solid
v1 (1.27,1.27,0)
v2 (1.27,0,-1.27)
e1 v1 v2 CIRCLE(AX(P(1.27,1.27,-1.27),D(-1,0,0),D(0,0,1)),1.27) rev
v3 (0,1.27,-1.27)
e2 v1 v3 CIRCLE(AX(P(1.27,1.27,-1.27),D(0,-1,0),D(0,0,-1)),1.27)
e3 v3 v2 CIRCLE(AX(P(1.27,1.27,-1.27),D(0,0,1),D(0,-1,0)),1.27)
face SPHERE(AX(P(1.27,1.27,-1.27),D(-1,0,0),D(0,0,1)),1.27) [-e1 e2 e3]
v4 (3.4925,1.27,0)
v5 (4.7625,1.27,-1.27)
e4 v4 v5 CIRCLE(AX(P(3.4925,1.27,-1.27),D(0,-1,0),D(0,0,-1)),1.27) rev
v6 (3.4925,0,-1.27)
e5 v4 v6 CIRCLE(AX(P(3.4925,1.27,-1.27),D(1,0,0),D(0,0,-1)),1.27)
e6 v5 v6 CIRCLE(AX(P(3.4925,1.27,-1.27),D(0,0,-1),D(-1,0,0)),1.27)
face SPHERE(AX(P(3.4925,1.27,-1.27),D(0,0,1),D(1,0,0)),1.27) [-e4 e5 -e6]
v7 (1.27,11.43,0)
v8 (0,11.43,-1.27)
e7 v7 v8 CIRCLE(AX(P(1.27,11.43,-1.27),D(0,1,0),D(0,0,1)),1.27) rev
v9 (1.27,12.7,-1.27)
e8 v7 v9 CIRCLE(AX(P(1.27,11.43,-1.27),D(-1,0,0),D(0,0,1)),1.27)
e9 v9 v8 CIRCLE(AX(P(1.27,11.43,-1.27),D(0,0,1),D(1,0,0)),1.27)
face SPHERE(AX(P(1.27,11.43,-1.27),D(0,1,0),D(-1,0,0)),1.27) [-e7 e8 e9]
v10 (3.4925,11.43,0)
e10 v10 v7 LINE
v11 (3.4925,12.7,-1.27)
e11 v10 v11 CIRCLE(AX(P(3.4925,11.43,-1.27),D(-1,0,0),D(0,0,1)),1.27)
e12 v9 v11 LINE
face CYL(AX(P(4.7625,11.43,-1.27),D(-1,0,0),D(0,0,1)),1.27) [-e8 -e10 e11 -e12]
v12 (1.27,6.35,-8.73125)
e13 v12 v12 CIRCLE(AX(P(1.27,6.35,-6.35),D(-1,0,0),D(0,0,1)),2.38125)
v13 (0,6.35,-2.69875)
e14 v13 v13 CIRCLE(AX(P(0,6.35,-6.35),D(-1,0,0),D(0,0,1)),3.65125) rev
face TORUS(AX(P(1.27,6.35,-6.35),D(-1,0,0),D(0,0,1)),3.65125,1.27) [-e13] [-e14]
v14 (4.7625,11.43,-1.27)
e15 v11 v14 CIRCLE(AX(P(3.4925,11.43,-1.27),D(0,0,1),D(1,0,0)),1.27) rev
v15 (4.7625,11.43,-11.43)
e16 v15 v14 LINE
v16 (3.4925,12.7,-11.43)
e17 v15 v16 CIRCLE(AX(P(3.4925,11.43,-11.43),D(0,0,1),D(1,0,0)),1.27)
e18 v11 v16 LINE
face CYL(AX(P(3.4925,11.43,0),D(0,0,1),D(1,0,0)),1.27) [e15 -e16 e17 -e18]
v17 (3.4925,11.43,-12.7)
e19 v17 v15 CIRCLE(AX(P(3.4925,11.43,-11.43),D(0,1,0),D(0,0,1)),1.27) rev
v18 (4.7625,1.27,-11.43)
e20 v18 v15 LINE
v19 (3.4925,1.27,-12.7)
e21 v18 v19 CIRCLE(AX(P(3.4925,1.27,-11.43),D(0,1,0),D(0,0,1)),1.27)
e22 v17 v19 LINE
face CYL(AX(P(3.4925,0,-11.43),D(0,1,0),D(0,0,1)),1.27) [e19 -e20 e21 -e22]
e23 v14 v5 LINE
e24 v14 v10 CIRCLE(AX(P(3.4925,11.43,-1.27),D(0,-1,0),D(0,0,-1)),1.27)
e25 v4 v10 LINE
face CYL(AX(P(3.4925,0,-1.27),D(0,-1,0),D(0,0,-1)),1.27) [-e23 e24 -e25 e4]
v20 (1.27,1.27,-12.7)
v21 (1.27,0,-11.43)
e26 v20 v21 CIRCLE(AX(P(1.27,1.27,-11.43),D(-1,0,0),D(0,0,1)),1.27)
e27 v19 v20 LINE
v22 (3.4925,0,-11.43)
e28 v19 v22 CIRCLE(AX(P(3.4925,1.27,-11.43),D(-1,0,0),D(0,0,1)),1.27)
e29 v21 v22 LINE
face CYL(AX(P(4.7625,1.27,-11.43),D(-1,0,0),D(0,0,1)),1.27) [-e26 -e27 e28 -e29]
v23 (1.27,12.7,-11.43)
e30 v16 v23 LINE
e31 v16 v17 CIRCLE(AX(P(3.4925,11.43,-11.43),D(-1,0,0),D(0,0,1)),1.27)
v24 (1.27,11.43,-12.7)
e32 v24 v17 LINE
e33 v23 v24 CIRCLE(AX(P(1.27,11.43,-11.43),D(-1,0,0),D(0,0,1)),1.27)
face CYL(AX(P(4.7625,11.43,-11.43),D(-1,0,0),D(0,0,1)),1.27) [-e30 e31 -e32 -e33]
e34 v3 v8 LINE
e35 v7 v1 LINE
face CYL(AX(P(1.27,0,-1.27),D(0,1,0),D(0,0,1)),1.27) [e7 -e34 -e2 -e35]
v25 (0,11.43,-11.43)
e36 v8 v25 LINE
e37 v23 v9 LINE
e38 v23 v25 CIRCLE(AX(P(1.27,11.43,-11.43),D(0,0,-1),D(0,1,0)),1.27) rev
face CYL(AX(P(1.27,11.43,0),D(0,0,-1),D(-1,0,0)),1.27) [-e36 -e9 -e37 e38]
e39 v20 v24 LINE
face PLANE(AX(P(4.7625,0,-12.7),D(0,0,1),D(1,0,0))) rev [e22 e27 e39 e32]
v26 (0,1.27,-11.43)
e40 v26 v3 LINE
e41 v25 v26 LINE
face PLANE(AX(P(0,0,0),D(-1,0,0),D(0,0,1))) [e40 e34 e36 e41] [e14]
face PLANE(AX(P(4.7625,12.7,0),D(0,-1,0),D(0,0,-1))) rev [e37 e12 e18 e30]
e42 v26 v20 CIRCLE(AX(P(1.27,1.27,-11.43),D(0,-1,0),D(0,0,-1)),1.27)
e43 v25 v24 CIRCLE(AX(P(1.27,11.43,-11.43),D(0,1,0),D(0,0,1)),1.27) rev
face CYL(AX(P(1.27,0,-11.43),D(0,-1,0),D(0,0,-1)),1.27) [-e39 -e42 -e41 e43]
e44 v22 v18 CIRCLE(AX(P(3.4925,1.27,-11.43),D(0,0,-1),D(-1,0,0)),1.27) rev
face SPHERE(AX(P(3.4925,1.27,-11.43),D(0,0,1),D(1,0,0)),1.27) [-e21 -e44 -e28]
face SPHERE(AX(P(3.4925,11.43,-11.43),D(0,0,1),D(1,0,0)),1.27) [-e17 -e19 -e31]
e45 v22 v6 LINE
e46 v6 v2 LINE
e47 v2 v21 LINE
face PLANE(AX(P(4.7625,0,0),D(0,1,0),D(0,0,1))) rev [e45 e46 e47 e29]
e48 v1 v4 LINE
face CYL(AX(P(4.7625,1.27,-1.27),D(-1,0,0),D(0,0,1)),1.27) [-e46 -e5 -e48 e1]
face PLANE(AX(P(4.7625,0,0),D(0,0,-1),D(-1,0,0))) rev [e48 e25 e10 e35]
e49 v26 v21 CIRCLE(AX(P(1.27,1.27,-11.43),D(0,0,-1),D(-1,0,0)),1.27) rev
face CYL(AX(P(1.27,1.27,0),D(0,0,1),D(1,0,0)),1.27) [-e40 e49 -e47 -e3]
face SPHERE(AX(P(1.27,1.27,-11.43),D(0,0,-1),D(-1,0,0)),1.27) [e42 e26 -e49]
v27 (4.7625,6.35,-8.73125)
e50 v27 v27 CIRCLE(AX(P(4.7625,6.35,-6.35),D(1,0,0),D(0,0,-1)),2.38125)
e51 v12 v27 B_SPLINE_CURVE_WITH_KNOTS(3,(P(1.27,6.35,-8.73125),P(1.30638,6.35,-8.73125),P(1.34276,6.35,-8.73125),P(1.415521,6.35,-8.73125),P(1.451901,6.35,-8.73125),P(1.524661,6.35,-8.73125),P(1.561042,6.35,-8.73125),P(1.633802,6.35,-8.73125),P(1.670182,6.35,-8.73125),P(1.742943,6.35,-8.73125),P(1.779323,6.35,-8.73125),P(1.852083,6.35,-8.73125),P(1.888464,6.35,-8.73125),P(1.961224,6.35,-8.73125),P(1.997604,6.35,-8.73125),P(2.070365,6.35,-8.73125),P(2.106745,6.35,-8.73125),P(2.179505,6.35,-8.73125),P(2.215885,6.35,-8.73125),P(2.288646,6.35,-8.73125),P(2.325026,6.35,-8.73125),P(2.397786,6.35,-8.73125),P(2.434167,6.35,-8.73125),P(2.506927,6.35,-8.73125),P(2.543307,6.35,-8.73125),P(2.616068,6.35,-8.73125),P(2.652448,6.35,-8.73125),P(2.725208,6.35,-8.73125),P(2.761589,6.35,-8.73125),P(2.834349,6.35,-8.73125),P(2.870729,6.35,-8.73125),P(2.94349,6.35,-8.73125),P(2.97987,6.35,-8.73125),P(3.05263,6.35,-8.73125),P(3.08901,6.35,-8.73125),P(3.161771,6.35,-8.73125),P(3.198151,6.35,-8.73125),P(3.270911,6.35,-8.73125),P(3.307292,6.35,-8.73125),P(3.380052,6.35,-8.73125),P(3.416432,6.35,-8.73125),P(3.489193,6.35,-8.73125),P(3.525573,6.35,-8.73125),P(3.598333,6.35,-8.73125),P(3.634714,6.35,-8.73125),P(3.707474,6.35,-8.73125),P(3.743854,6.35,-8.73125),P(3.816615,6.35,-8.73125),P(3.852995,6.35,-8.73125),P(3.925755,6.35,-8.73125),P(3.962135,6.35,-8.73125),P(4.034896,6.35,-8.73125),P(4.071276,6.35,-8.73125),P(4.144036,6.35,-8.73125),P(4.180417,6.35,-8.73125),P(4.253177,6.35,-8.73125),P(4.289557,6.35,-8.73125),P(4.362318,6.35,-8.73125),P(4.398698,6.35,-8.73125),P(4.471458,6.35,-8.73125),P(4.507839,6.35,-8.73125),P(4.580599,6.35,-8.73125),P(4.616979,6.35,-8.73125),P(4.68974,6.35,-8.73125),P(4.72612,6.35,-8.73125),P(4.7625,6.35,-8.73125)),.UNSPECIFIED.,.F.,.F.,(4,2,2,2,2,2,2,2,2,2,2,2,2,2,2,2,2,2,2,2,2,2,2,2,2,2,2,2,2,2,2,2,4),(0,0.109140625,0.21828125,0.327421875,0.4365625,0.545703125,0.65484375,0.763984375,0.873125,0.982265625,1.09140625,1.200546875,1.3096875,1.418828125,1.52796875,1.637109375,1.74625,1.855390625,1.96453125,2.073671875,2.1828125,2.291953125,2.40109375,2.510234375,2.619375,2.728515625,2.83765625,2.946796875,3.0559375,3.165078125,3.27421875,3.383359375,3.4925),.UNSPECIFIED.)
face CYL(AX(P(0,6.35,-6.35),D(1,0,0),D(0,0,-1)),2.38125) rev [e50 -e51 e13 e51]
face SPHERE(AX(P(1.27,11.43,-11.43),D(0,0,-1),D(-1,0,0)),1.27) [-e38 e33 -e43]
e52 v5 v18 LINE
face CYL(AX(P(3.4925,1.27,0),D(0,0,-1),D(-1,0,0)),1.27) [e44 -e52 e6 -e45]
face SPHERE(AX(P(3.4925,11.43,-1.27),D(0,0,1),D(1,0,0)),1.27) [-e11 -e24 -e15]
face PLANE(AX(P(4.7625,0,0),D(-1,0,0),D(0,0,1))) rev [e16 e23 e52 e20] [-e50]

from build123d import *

# Parameters (mm, degrees)
SKETCH2_W           = 12.7
SKETCH2_H           = 12.7
BOSS_EXTRUDE4_DEPTH = 4.7625
SKETCH3_R           = 2.38125
CUT_EXTRUDE1_DEPTH  = 19.581211108
FILLET1_R           = 1.27
FILLET2_R           = 1.27


with BuildPart() as part:
    # Sketch2 → Boss-Extrude4 (new body)
    with BuildSketch(Plane(origin=(0, 0, 0), x_dir=(0, 0, -1), z_dir=(1, 0, 0))):
        with Locations((6.35, 6.35)):
            Rectangle(SKETCH2_W, SKETCH2_H)
    extrude(amount=BOSS_EXTRUDE4_DEPTH)

    # Sketch3 → Cut-Extrude1 (cut, through all)
    with BuildSketch(Plane(origin=(4.7625, 0, 0), x_dir=(0, 0, -1), z_dir=(1, 0, 0))):
        with Locations((6.35, 6.35)):
            Circle(SKETCH3_R)
    extrude(amount=-CUT_EXTRUDE1_DEPTH, mode=Mode.SUBTRACT)

    # Fillet1
    fillet1_edges = [part.edges().sort_by_distance(p)[0] for p in [
        (4.7625, 6.35, -12.7),
        (4.7625, 12.7, -6.35),
        (4.7625, 6.35, 0),
        (4.7625, 0, -6.35),
    ]]
    fillet(fillet1_edges, radius=FILLET1_R)

    # Fillet2
    # the kernel refuses this fillet: 1.27 mm, written as the material it takes off along each edge
    with BuildSketch(Plane(origin=(3.4925, 1.27, -1.27), x_dir=(0, 0, 1), z_dir=(0, -1, 0))) as fillet2_piece_1_section:
        Polygon((0, 0), (FILLET2_R, 0), (FILLET2_R, -FILLET2_R), (0, -FILLET2_R), align=None)
    fillet2_piece_1 = extrude(amount=FILLET2_R, mode=Mode.PRIVATE)
    fillet2_piece_1 = fillet2_piece_1 - Plane(origin=(3.4925, 1.27, -1.27), x_dir=(-0.7071067811865475, 0, -0.7071067811865475), z_dir=(0, -1, 0)) * Sphere(FILLET2_R, mode=Mode.PRIVATE)
    add(fillet2_piece_1, mode=Mode.SUBTRACT)
    with BuildSketch(Plane(origin=(3.4925, 11.43, -1.27), x_dir=(0, 1, 0), z_dir=(0, 0, 1))) as fillet2_piece_2_section:
        Polygon((0, 0), (FILLET2_R, 0), (FILLET2_R, -FILLET2_R), (0, -FILLET2_R), align=None)
    fillet2_piece_2 = extrude(amount=FILLET2_R, mode=Mode.PRIVATE)
    fillet2_piece_2 = fillet2_piece_2 - Plane(origin=(3.4925, 11.43, -1.27), x_dir=(-0.7071067811865475, -0.7071067811865475, 0), z_dir=(0, 0, 1)) * Sphere(FILLET2_R, mode=Mode.PRIVATE)
    add(fillet2_piece_2, mode=Mode.SUBTRACT)
    with BuildSketch(Plane(origin=(3.4925, 1.27, -11.43), x_dir=(0, 0, -1), z_dir=(0, -1, 0))) as fillet2_piece_3_section:
        Polygon((0, 0), (FILLET2_R, 0), (FILLET2_R, FILLET2_R), (0, FILLET2_R), align=None)
    fillet2_piece_3 = extrude(amount=FILLET2_R, mode=Mode.PRIVATE)
    fillet2_piece_3 = fillet2_piece_3 - Plane(origin=(3.4925, 1.27, -11.43), x_dir=(-0.7071067811865475, 0, 0.7071067811865475), z_dir=(0, -1, 0)) * Sphere(FILLET2_R, mode=Mode.PRIVATE)
    add(fillet2_piece_3, mode=Mode.SUBTRACT)
    with BuildSketch(Plane(origin=(3.4925, 11.43, -11.43), x_dir=(0, 1, 0), z_dir=(0, 0, -1))) as fillet2_piece_4_section:
        Polygon((0, 0), (FILLET2_R, 0), (FILLET2_R, FILLET2_R), (0, FILLET2_R), align=None)
    fillet2_piece_4 = extrude(amount=FILLET2_R, mode=Mode.PRIVATE)
    fillet2_piece_4 = fillet2_piece_4 - Plane(origin=(3.4925, 11.43, -11.43), x_dir=(-0.7071067811865475, -0.7071067811865475, 0), z_dir=(0, 0, -1)) * Sphere(FILLET2_R, mode=Mode.PRIVATE)
    add(fillet2_piece_4, mode=Mode.SUBTRACT)
    with BuildSketch(Plane(origin=(1.27, 11.43, -11.43), x_dir=(0, 0, -1), z_dir=(-1, 0, 0))) as fillet2_piece_5_section:
        Polygon((0, 0), (FILLET2_R, 0), (FILLET2_R, -FILLET2_R), (0, -FILLET2_R), align=None)
    fillet2_piece_5 = extrude(amount=FILLET2_R, mode=Mode.PRIVATE)
    fillet2_piece_5 = fillet2_piece_5 - Plane(origin=(1.27, 11.43, -11.43), x_dir=(0, -0.7071067811865475, 0.7071067811865475), z_dir=(-1, 0, 0)) * Sphere(FILLET2_R, mode=Mode.PRIVATE)
    add(fillet2_piece_5, mode=Mode.SUBTRACT)
    with BuildSketch(Plane(origin=(1.27, 1.27, -11.43), x_dir=(-1, 0, 0), z_dir=(0, -1, 0))) as fillet2_piece_6_section:
        Polygon((0, 0), (FILLET2_R, 0), (FILLET2_R, FILLET2_R), (0, FILLET2_R), align=None)
    fillet2_piece_6 = extrude(amount=FILLET2_R, mode=Mode.PRIVATE)
    fillet2_piece_6 = fillet2_piece_6 - Plane(origin=(1.27, 1.27, -11.43), x_dir=(0.7071067811865475, 0, 0.7071067811865475), z_dir=(0, -1, 0)) * Sphere(FILLET2_R, mode=Mode.PRIVATE)
    add(fillet2_piece_6, mode=Mode.SUBTRACT)
    with BuildSketch(Plane(origin=(1.27, 1.27, -1.27), x_dir=(0, 0, 1), z_dir=(0, -1, 0))) as fillet2_piece_7_section:
        Polygon((0, 0), (FILLET2_R, 0), (FILLET2_R, FILLET2_R), (0, FILLET2_R), align=None)
    fillet2_piece_7 = extrude(amount=FILLET2_R, mode=Mode.PRIVATE)
    fillet2_piece_7 = fillet2_piece_7 - Plane(origin=(1.27, 1.27, -1.27), x_dir=(0.7071067811865475, 0, -0.7071067811865475), z_dir=(0, -1, 0)) * Sphere(FILLET2_R, mode=Mode.PRIVATE)
    add(fillet2_piece_7, mode=Mode.SUBTRACT)
    with BuildSketch(Plane(origin=(1.27, 11.43, -1.27), x_dir=(-1, 0, 0), z_dir=(0, 0, 1))) as fillet2_piece_8_section:
        Polygon((0, 0), (FILLET2_R, 0), (FILLET2_R, -FILLET2_R), (0, -FILLET2_R), align=None)
    fillet2_piece_8 = extrude(amount=FILLET2_R, mode=Mode.PRIVATE)
    fillet2_piece_8 = fillet2_piece_8 - Plane(origin=(1.27, 11.43, -1.27), x_dir=(0.7071067811865475, -0.7071067811865475, 0), z_dir=(0, 0, 1)) * Sphere(FILLET2_R, mode=Mode.PRIVATE)
    add(fillet2_piece_8, mode=Mode.SUBTRACT)
    with BuildSketch(Plane(origin=(0, 6.35, -6.35), x_dir=(0, 0, -1), z_dir=(0, -1, 0))) as fillet2_piece_9:
        with BuildLine():
            CenterArc((2.38125 + FILLET2_R, FILLET2_R), FILLET2_R, 180, 90)
            Line((2.38125, FILLET2_R), (2.38125, 0))
            Line((2.38125, 0), (2.38125 + FILLET2_R, 0))
        make_face()
    revolve(axis=Axis((0, 6.35, -6.35), (1, 0, 0)), mode=Mode.SUBTRACT)
    with BuildSketch(Plane(origin=(1.27, 12.7, -12.7), x_dir=(0, -1, 0), z_dir=(1, 0, 0)), Plane(origin=(1.27, 0, -12.7), x_dir=(0, 0, 1), z_dir=(1, 0, 0))) as fillet2_piece_10:
        with BuildLine():
            CenterArc((FILLET2_R, -FILLET2_R), FILLET2_R, 90, 90)
            Line((0, -FILLET2_R), (0, 0))
            Line((0, 0), (FILLET2_R, 0))
        make_face()
    extrude(amount=2.2225, mode=Mode.SUBTRACT)
    with BuildSketch(Plane(origin=(1.27, 0, 0), x_dir=(0, 0, -1), z_dir=(1, 0, 0)), Plane(origin=(1.27, 12.7, 0), x_dir=(0, -1, 0), z_dir=(1, 0, 0))) as fillet2_piece_11:
        with BuildLine():
            CenterArc((FILLET2_R, FILLET2_R), FILLET2_R, 180, 90)
            Line((0, FILLET2_R), (0, 0))
            Line((0, 0), (FILLET2_R, 0))
        make_face()
    extrude(amount=2.2225, mode=Mode.SUBTRACT)
    with BuildSketch(Plane(origin=(0, 12.7, -11.43), x_dir=(0, -1, 0), z_dir=(0, 0, 1)), Plane(origin=(0, 1.27, -12.7), x_dir=(0, 0, 1), z_dir=(0, 1, 0))) as fillet2_piece_12:
        with BuildLine():
            CenterArc((FILLET2_R, FILLET2_R), FILLET2_R, 180, 90)
            Line((0, FILLET2_R), (0, 0))
            Line((0, 0), (FILLET2_R, 0))
        make_face()
    extrude(amount=10.16, mode=Mode.SUBTRACT)
    with BuildSketch(Plane(origin=(0, 0, -1.27), x_dir=(1, 0, 0), z_dir=(0, 0, -1)), Plane(origin=(0, 11.43, 0), x_dir=(1, 0, 0), z_dir=(0, -1, 0))) as fillet2_piece_13:
        with BuildLine():
            CenterArc((FILLET2_R, -FILLET2_R), FILLET2_R, 90, 90)
            Line((0, -FILLET2_R), (0, 0))
            Line((0, 0), (FILLET2_R, 0))
        make_face()
    extrude(amount=10.16, mode=Mode.SUBTRACT)


solid = part.part
